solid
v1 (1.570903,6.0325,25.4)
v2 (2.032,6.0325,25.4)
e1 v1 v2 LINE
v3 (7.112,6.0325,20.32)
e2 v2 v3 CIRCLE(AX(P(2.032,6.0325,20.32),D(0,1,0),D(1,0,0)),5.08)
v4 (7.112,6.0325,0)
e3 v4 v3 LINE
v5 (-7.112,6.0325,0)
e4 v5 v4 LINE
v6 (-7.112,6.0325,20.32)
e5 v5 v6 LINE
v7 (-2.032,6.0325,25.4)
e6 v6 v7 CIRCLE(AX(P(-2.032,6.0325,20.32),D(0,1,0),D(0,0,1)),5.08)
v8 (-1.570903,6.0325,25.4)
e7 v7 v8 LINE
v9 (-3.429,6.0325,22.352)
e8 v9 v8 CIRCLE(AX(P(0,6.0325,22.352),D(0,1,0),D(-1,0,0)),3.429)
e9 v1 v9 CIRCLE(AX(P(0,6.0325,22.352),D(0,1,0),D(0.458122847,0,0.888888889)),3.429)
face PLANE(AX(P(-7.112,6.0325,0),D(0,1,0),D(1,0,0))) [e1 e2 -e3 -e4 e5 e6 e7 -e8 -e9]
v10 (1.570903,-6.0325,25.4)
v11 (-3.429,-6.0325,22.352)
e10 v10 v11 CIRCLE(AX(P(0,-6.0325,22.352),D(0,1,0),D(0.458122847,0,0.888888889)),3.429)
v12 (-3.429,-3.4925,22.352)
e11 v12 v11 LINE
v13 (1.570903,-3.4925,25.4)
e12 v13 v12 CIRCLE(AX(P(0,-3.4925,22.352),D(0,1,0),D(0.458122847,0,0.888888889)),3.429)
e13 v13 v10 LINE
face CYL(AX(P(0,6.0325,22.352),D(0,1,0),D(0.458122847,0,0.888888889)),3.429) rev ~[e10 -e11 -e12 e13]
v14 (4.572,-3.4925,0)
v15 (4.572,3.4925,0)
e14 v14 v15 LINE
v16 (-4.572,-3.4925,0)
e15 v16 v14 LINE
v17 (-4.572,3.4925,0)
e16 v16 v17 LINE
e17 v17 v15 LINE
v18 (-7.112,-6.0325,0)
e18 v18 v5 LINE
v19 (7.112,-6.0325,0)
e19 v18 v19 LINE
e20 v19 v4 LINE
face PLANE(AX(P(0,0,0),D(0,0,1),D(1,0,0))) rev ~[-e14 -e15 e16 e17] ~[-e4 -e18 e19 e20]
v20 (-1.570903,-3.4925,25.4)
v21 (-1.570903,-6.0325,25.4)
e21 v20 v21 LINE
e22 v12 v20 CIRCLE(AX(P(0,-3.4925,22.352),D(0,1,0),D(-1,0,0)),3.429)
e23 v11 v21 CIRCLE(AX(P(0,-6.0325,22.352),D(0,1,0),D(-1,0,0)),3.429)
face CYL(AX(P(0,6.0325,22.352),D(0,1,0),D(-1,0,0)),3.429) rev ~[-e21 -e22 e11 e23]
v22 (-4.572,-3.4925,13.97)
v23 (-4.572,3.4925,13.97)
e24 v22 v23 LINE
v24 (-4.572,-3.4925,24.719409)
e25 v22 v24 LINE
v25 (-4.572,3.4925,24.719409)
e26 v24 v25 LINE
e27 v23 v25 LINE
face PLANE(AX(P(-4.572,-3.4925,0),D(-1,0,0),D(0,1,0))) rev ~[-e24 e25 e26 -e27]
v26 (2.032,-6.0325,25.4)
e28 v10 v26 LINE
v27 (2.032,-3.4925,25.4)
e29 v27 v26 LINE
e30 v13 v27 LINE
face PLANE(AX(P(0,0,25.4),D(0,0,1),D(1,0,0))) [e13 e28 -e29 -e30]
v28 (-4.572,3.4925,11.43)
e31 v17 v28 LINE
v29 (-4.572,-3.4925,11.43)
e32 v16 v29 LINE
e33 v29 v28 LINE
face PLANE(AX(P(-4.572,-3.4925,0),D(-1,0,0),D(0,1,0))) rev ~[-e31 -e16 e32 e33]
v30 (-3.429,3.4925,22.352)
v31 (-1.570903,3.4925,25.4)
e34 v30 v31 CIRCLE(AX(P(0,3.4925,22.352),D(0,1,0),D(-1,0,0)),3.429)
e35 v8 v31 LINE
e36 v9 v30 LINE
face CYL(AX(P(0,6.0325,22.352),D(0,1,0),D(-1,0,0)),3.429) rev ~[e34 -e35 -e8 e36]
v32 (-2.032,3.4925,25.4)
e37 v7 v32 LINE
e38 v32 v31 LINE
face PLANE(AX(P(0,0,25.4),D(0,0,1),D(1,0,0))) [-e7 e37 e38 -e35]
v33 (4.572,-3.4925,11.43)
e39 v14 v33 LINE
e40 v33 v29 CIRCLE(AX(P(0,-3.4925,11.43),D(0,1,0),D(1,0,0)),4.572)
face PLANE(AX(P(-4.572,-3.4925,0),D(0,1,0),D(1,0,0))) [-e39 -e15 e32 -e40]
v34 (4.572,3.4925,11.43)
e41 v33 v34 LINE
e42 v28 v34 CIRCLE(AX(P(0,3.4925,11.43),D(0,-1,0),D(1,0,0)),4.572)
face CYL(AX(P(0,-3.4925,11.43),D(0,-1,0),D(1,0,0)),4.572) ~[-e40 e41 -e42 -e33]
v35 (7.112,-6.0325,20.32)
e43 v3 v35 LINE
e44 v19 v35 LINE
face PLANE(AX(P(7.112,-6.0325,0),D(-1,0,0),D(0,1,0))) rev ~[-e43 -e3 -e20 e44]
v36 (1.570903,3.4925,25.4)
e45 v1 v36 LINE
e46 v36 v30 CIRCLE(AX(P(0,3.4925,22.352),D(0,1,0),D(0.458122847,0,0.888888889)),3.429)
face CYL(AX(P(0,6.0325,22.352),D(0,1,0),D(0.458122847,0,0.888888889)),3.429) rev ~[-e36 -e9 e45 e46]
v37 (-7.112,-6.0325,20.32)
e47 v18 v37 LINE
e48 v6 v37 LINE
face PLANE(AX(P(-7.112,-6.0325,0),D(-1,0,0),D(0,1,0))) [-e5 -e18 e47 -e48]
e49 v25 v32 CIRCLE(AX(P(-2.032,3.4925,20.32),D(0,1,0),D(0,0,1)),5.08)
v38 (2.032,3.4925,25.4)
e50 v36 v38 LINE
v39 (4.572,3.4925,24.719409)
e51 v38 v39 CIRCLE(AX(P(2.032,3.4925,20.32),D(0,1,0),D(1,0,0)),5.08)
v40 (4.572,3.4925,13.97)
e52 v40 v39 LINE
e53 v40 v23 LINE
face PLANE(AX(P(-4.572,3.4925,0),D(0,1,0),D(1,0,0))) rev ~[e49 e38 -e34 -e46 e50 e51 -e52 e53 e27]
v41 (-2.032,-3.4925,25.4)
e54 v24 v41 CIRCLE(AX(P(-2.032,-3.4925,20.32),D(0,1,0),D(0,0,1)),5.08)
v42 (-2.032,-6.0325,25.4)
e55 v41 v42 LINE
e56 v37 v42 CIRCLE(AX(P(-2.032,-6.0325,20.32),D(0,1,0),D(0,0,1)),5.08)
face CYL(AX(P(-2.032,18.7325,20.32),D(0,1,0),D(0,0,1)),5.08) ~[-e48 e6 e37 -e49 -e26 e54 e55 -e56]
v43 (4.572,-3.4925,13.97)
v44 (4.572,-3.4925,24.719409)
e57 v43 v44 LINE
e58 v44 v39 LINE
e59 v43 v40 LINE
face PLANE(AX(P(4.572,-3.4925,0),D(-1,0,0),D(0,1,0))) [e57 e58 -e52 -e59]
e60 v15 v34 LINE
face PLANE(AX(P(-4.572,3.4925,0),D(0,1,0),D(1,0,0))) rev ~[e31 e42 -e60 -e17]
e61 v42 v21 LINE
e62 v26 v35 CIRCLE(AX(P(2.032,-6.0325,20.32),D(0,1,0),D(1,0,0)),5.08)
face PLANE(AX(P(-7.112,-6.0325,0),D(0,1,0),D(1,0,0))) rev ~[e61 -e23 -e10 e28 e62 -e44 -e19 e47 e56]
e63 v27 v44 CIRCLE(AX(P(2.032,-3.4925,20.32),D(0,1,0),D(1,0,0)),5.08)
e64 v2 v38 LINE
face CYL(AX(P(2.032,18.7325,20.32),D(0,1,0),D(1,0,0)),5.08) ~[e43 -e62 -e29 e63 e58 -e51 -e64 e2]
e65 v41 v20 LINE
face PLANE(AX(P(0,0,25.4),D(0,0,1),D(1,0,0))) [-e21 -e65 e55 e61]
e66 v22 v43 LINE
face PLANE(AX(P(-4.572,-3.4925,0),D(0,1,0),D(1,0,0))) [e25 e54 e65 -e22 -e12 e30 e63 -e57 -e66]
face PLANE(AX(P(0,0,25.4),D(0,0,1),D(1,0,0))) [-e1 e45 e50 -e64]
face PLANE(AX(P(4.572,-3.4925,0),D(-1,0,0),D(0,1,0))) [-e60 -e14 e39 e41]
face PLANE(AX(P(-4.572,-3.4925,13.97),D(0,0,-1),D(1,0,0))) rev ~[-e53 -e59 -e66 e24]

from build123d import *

# Parameters (mm, degrees)
F0_W        = 14.224
F0_H        = 12.065
F0_W_2      = 9.144
F0_H_2      = 6.985
F1_DEPTH    = 25.4
F3_DEPTH    = 8.89
F5_DEPTH    = 25.4
F6_T1_DEPTH = 37.465


# Not quite as in the source:
# - a fillet or chamfer that OpenCascade refuses, or shapes differently, is made with other operations: its cross-section is extruded or revolved along the edge and cut away or added


with BuildPart() as f1:
    # F0 (on Top) → F1 (new body)
    with BuildSketch(Plane.XY):
        Rectangle(F0_W, F0_H)
        Rectangle(F0_W_2, F0_H_2, mode=Mode.SUBTRACT)
    extrude(amount=F1_DEPTH)

    # F2 (on face) → F3 (join)
    with BuildSketch(Plane(origin=(0, -3.4925, 0), x_dir=(-1, 0, 0), z_dir=(0, 1, 0))):
        with BuildLine():
            Line((3.801523905, 13.97), (-3.801523905, 13.97))
            ThreePointArc((-3.801523905, 13.97), (-4.3751429287, 12.7571429287), (-4.572, 11.43))
            Line((-4.572, 11.43), (4.572, 11.43))
            ThreePointArc((4.572, 11.43), (4.3751429287, 12.7571429287), (3.801523905, 13.97))
        make_face()
        with BuildLine():
            Line((-3.801523905, 13.97), (-4.572, 13.97))
            Line((-4.572, 13.97), (-4.572, 11.43))
            ThreePointArc((-4.572, 11.43), (-4.3751429287, 12.7571429287), (-3.801523905, 13.97))
        make_face()
        with BuildLine():
            Line((4.572, 13.97), (3.801523905, 13.97))
            ThreePointArc((3.801523905, 13.97), (4.3751429287, 12.7571429287), (4.572, 11.43))
            Line((4.572, 11.43), (4.572, 13.97))
        make_face()
        with BuildLine():
            Line((4.572, 11.43), (-4.572, 11.43))
            ThreePointArc((-4.572, 11.43), (0, 6.858), (4.572, 11.43))
        make_face()
    extrude(amount=F3_DEPTH)

    # F4 (on face) → F5 (cut)
    with BuildSketch(Plane(origin=(0, 6.0325, 0), x_dir=(-1, 0, 0), z_dir=(0, 1, 0))):
        with BuildLine():
            ThreePointArc((-1.5709032434, 25.4), (-1.784854865, 19.424145135), (3.429, 22.352))
            ThreePointArc((3.429, 22.352), (2.927854865, 24.136854865), (1.5709032434, 25.4))
            Line((1.5709032434, 25.4), (-1.5709032434, 25.4))
        make_face()
    extrude(amount=-F5_DEPTH, mode=Mode.SUBTRACT)

    # F6: fillet of radius 5.08 on 2 edges, made by hand

    # F6_s2 → F6_t1 (cut)
    with BuildSketch(Plane.XZ.offset(-18.7325)):
        with BuildLine():
            ThreePointArc((7.112, 20.32), (5.6241024484, 23.9121024484), (2.032, 25.4))
            Line((2.032, 25.4), (7.112, 25.4))
            Line((7.112, 25.4), (7.112, 20.32))
        make_face()
        with BuildLine():
            ThreePointArc((-2.032, 25.4), (-5.6241024484, 23.9121024484), (-7.112, 20.32))
            Line((-7.112, 20.32), (-7.112, 25.4))
            Line((-7.112, 25.4), (-2.032, 25.4))
        make_face()
    extrude(amount=F6_T1_DEPTH, mode=Mode.SUBTRACT)


solid = f1.part
